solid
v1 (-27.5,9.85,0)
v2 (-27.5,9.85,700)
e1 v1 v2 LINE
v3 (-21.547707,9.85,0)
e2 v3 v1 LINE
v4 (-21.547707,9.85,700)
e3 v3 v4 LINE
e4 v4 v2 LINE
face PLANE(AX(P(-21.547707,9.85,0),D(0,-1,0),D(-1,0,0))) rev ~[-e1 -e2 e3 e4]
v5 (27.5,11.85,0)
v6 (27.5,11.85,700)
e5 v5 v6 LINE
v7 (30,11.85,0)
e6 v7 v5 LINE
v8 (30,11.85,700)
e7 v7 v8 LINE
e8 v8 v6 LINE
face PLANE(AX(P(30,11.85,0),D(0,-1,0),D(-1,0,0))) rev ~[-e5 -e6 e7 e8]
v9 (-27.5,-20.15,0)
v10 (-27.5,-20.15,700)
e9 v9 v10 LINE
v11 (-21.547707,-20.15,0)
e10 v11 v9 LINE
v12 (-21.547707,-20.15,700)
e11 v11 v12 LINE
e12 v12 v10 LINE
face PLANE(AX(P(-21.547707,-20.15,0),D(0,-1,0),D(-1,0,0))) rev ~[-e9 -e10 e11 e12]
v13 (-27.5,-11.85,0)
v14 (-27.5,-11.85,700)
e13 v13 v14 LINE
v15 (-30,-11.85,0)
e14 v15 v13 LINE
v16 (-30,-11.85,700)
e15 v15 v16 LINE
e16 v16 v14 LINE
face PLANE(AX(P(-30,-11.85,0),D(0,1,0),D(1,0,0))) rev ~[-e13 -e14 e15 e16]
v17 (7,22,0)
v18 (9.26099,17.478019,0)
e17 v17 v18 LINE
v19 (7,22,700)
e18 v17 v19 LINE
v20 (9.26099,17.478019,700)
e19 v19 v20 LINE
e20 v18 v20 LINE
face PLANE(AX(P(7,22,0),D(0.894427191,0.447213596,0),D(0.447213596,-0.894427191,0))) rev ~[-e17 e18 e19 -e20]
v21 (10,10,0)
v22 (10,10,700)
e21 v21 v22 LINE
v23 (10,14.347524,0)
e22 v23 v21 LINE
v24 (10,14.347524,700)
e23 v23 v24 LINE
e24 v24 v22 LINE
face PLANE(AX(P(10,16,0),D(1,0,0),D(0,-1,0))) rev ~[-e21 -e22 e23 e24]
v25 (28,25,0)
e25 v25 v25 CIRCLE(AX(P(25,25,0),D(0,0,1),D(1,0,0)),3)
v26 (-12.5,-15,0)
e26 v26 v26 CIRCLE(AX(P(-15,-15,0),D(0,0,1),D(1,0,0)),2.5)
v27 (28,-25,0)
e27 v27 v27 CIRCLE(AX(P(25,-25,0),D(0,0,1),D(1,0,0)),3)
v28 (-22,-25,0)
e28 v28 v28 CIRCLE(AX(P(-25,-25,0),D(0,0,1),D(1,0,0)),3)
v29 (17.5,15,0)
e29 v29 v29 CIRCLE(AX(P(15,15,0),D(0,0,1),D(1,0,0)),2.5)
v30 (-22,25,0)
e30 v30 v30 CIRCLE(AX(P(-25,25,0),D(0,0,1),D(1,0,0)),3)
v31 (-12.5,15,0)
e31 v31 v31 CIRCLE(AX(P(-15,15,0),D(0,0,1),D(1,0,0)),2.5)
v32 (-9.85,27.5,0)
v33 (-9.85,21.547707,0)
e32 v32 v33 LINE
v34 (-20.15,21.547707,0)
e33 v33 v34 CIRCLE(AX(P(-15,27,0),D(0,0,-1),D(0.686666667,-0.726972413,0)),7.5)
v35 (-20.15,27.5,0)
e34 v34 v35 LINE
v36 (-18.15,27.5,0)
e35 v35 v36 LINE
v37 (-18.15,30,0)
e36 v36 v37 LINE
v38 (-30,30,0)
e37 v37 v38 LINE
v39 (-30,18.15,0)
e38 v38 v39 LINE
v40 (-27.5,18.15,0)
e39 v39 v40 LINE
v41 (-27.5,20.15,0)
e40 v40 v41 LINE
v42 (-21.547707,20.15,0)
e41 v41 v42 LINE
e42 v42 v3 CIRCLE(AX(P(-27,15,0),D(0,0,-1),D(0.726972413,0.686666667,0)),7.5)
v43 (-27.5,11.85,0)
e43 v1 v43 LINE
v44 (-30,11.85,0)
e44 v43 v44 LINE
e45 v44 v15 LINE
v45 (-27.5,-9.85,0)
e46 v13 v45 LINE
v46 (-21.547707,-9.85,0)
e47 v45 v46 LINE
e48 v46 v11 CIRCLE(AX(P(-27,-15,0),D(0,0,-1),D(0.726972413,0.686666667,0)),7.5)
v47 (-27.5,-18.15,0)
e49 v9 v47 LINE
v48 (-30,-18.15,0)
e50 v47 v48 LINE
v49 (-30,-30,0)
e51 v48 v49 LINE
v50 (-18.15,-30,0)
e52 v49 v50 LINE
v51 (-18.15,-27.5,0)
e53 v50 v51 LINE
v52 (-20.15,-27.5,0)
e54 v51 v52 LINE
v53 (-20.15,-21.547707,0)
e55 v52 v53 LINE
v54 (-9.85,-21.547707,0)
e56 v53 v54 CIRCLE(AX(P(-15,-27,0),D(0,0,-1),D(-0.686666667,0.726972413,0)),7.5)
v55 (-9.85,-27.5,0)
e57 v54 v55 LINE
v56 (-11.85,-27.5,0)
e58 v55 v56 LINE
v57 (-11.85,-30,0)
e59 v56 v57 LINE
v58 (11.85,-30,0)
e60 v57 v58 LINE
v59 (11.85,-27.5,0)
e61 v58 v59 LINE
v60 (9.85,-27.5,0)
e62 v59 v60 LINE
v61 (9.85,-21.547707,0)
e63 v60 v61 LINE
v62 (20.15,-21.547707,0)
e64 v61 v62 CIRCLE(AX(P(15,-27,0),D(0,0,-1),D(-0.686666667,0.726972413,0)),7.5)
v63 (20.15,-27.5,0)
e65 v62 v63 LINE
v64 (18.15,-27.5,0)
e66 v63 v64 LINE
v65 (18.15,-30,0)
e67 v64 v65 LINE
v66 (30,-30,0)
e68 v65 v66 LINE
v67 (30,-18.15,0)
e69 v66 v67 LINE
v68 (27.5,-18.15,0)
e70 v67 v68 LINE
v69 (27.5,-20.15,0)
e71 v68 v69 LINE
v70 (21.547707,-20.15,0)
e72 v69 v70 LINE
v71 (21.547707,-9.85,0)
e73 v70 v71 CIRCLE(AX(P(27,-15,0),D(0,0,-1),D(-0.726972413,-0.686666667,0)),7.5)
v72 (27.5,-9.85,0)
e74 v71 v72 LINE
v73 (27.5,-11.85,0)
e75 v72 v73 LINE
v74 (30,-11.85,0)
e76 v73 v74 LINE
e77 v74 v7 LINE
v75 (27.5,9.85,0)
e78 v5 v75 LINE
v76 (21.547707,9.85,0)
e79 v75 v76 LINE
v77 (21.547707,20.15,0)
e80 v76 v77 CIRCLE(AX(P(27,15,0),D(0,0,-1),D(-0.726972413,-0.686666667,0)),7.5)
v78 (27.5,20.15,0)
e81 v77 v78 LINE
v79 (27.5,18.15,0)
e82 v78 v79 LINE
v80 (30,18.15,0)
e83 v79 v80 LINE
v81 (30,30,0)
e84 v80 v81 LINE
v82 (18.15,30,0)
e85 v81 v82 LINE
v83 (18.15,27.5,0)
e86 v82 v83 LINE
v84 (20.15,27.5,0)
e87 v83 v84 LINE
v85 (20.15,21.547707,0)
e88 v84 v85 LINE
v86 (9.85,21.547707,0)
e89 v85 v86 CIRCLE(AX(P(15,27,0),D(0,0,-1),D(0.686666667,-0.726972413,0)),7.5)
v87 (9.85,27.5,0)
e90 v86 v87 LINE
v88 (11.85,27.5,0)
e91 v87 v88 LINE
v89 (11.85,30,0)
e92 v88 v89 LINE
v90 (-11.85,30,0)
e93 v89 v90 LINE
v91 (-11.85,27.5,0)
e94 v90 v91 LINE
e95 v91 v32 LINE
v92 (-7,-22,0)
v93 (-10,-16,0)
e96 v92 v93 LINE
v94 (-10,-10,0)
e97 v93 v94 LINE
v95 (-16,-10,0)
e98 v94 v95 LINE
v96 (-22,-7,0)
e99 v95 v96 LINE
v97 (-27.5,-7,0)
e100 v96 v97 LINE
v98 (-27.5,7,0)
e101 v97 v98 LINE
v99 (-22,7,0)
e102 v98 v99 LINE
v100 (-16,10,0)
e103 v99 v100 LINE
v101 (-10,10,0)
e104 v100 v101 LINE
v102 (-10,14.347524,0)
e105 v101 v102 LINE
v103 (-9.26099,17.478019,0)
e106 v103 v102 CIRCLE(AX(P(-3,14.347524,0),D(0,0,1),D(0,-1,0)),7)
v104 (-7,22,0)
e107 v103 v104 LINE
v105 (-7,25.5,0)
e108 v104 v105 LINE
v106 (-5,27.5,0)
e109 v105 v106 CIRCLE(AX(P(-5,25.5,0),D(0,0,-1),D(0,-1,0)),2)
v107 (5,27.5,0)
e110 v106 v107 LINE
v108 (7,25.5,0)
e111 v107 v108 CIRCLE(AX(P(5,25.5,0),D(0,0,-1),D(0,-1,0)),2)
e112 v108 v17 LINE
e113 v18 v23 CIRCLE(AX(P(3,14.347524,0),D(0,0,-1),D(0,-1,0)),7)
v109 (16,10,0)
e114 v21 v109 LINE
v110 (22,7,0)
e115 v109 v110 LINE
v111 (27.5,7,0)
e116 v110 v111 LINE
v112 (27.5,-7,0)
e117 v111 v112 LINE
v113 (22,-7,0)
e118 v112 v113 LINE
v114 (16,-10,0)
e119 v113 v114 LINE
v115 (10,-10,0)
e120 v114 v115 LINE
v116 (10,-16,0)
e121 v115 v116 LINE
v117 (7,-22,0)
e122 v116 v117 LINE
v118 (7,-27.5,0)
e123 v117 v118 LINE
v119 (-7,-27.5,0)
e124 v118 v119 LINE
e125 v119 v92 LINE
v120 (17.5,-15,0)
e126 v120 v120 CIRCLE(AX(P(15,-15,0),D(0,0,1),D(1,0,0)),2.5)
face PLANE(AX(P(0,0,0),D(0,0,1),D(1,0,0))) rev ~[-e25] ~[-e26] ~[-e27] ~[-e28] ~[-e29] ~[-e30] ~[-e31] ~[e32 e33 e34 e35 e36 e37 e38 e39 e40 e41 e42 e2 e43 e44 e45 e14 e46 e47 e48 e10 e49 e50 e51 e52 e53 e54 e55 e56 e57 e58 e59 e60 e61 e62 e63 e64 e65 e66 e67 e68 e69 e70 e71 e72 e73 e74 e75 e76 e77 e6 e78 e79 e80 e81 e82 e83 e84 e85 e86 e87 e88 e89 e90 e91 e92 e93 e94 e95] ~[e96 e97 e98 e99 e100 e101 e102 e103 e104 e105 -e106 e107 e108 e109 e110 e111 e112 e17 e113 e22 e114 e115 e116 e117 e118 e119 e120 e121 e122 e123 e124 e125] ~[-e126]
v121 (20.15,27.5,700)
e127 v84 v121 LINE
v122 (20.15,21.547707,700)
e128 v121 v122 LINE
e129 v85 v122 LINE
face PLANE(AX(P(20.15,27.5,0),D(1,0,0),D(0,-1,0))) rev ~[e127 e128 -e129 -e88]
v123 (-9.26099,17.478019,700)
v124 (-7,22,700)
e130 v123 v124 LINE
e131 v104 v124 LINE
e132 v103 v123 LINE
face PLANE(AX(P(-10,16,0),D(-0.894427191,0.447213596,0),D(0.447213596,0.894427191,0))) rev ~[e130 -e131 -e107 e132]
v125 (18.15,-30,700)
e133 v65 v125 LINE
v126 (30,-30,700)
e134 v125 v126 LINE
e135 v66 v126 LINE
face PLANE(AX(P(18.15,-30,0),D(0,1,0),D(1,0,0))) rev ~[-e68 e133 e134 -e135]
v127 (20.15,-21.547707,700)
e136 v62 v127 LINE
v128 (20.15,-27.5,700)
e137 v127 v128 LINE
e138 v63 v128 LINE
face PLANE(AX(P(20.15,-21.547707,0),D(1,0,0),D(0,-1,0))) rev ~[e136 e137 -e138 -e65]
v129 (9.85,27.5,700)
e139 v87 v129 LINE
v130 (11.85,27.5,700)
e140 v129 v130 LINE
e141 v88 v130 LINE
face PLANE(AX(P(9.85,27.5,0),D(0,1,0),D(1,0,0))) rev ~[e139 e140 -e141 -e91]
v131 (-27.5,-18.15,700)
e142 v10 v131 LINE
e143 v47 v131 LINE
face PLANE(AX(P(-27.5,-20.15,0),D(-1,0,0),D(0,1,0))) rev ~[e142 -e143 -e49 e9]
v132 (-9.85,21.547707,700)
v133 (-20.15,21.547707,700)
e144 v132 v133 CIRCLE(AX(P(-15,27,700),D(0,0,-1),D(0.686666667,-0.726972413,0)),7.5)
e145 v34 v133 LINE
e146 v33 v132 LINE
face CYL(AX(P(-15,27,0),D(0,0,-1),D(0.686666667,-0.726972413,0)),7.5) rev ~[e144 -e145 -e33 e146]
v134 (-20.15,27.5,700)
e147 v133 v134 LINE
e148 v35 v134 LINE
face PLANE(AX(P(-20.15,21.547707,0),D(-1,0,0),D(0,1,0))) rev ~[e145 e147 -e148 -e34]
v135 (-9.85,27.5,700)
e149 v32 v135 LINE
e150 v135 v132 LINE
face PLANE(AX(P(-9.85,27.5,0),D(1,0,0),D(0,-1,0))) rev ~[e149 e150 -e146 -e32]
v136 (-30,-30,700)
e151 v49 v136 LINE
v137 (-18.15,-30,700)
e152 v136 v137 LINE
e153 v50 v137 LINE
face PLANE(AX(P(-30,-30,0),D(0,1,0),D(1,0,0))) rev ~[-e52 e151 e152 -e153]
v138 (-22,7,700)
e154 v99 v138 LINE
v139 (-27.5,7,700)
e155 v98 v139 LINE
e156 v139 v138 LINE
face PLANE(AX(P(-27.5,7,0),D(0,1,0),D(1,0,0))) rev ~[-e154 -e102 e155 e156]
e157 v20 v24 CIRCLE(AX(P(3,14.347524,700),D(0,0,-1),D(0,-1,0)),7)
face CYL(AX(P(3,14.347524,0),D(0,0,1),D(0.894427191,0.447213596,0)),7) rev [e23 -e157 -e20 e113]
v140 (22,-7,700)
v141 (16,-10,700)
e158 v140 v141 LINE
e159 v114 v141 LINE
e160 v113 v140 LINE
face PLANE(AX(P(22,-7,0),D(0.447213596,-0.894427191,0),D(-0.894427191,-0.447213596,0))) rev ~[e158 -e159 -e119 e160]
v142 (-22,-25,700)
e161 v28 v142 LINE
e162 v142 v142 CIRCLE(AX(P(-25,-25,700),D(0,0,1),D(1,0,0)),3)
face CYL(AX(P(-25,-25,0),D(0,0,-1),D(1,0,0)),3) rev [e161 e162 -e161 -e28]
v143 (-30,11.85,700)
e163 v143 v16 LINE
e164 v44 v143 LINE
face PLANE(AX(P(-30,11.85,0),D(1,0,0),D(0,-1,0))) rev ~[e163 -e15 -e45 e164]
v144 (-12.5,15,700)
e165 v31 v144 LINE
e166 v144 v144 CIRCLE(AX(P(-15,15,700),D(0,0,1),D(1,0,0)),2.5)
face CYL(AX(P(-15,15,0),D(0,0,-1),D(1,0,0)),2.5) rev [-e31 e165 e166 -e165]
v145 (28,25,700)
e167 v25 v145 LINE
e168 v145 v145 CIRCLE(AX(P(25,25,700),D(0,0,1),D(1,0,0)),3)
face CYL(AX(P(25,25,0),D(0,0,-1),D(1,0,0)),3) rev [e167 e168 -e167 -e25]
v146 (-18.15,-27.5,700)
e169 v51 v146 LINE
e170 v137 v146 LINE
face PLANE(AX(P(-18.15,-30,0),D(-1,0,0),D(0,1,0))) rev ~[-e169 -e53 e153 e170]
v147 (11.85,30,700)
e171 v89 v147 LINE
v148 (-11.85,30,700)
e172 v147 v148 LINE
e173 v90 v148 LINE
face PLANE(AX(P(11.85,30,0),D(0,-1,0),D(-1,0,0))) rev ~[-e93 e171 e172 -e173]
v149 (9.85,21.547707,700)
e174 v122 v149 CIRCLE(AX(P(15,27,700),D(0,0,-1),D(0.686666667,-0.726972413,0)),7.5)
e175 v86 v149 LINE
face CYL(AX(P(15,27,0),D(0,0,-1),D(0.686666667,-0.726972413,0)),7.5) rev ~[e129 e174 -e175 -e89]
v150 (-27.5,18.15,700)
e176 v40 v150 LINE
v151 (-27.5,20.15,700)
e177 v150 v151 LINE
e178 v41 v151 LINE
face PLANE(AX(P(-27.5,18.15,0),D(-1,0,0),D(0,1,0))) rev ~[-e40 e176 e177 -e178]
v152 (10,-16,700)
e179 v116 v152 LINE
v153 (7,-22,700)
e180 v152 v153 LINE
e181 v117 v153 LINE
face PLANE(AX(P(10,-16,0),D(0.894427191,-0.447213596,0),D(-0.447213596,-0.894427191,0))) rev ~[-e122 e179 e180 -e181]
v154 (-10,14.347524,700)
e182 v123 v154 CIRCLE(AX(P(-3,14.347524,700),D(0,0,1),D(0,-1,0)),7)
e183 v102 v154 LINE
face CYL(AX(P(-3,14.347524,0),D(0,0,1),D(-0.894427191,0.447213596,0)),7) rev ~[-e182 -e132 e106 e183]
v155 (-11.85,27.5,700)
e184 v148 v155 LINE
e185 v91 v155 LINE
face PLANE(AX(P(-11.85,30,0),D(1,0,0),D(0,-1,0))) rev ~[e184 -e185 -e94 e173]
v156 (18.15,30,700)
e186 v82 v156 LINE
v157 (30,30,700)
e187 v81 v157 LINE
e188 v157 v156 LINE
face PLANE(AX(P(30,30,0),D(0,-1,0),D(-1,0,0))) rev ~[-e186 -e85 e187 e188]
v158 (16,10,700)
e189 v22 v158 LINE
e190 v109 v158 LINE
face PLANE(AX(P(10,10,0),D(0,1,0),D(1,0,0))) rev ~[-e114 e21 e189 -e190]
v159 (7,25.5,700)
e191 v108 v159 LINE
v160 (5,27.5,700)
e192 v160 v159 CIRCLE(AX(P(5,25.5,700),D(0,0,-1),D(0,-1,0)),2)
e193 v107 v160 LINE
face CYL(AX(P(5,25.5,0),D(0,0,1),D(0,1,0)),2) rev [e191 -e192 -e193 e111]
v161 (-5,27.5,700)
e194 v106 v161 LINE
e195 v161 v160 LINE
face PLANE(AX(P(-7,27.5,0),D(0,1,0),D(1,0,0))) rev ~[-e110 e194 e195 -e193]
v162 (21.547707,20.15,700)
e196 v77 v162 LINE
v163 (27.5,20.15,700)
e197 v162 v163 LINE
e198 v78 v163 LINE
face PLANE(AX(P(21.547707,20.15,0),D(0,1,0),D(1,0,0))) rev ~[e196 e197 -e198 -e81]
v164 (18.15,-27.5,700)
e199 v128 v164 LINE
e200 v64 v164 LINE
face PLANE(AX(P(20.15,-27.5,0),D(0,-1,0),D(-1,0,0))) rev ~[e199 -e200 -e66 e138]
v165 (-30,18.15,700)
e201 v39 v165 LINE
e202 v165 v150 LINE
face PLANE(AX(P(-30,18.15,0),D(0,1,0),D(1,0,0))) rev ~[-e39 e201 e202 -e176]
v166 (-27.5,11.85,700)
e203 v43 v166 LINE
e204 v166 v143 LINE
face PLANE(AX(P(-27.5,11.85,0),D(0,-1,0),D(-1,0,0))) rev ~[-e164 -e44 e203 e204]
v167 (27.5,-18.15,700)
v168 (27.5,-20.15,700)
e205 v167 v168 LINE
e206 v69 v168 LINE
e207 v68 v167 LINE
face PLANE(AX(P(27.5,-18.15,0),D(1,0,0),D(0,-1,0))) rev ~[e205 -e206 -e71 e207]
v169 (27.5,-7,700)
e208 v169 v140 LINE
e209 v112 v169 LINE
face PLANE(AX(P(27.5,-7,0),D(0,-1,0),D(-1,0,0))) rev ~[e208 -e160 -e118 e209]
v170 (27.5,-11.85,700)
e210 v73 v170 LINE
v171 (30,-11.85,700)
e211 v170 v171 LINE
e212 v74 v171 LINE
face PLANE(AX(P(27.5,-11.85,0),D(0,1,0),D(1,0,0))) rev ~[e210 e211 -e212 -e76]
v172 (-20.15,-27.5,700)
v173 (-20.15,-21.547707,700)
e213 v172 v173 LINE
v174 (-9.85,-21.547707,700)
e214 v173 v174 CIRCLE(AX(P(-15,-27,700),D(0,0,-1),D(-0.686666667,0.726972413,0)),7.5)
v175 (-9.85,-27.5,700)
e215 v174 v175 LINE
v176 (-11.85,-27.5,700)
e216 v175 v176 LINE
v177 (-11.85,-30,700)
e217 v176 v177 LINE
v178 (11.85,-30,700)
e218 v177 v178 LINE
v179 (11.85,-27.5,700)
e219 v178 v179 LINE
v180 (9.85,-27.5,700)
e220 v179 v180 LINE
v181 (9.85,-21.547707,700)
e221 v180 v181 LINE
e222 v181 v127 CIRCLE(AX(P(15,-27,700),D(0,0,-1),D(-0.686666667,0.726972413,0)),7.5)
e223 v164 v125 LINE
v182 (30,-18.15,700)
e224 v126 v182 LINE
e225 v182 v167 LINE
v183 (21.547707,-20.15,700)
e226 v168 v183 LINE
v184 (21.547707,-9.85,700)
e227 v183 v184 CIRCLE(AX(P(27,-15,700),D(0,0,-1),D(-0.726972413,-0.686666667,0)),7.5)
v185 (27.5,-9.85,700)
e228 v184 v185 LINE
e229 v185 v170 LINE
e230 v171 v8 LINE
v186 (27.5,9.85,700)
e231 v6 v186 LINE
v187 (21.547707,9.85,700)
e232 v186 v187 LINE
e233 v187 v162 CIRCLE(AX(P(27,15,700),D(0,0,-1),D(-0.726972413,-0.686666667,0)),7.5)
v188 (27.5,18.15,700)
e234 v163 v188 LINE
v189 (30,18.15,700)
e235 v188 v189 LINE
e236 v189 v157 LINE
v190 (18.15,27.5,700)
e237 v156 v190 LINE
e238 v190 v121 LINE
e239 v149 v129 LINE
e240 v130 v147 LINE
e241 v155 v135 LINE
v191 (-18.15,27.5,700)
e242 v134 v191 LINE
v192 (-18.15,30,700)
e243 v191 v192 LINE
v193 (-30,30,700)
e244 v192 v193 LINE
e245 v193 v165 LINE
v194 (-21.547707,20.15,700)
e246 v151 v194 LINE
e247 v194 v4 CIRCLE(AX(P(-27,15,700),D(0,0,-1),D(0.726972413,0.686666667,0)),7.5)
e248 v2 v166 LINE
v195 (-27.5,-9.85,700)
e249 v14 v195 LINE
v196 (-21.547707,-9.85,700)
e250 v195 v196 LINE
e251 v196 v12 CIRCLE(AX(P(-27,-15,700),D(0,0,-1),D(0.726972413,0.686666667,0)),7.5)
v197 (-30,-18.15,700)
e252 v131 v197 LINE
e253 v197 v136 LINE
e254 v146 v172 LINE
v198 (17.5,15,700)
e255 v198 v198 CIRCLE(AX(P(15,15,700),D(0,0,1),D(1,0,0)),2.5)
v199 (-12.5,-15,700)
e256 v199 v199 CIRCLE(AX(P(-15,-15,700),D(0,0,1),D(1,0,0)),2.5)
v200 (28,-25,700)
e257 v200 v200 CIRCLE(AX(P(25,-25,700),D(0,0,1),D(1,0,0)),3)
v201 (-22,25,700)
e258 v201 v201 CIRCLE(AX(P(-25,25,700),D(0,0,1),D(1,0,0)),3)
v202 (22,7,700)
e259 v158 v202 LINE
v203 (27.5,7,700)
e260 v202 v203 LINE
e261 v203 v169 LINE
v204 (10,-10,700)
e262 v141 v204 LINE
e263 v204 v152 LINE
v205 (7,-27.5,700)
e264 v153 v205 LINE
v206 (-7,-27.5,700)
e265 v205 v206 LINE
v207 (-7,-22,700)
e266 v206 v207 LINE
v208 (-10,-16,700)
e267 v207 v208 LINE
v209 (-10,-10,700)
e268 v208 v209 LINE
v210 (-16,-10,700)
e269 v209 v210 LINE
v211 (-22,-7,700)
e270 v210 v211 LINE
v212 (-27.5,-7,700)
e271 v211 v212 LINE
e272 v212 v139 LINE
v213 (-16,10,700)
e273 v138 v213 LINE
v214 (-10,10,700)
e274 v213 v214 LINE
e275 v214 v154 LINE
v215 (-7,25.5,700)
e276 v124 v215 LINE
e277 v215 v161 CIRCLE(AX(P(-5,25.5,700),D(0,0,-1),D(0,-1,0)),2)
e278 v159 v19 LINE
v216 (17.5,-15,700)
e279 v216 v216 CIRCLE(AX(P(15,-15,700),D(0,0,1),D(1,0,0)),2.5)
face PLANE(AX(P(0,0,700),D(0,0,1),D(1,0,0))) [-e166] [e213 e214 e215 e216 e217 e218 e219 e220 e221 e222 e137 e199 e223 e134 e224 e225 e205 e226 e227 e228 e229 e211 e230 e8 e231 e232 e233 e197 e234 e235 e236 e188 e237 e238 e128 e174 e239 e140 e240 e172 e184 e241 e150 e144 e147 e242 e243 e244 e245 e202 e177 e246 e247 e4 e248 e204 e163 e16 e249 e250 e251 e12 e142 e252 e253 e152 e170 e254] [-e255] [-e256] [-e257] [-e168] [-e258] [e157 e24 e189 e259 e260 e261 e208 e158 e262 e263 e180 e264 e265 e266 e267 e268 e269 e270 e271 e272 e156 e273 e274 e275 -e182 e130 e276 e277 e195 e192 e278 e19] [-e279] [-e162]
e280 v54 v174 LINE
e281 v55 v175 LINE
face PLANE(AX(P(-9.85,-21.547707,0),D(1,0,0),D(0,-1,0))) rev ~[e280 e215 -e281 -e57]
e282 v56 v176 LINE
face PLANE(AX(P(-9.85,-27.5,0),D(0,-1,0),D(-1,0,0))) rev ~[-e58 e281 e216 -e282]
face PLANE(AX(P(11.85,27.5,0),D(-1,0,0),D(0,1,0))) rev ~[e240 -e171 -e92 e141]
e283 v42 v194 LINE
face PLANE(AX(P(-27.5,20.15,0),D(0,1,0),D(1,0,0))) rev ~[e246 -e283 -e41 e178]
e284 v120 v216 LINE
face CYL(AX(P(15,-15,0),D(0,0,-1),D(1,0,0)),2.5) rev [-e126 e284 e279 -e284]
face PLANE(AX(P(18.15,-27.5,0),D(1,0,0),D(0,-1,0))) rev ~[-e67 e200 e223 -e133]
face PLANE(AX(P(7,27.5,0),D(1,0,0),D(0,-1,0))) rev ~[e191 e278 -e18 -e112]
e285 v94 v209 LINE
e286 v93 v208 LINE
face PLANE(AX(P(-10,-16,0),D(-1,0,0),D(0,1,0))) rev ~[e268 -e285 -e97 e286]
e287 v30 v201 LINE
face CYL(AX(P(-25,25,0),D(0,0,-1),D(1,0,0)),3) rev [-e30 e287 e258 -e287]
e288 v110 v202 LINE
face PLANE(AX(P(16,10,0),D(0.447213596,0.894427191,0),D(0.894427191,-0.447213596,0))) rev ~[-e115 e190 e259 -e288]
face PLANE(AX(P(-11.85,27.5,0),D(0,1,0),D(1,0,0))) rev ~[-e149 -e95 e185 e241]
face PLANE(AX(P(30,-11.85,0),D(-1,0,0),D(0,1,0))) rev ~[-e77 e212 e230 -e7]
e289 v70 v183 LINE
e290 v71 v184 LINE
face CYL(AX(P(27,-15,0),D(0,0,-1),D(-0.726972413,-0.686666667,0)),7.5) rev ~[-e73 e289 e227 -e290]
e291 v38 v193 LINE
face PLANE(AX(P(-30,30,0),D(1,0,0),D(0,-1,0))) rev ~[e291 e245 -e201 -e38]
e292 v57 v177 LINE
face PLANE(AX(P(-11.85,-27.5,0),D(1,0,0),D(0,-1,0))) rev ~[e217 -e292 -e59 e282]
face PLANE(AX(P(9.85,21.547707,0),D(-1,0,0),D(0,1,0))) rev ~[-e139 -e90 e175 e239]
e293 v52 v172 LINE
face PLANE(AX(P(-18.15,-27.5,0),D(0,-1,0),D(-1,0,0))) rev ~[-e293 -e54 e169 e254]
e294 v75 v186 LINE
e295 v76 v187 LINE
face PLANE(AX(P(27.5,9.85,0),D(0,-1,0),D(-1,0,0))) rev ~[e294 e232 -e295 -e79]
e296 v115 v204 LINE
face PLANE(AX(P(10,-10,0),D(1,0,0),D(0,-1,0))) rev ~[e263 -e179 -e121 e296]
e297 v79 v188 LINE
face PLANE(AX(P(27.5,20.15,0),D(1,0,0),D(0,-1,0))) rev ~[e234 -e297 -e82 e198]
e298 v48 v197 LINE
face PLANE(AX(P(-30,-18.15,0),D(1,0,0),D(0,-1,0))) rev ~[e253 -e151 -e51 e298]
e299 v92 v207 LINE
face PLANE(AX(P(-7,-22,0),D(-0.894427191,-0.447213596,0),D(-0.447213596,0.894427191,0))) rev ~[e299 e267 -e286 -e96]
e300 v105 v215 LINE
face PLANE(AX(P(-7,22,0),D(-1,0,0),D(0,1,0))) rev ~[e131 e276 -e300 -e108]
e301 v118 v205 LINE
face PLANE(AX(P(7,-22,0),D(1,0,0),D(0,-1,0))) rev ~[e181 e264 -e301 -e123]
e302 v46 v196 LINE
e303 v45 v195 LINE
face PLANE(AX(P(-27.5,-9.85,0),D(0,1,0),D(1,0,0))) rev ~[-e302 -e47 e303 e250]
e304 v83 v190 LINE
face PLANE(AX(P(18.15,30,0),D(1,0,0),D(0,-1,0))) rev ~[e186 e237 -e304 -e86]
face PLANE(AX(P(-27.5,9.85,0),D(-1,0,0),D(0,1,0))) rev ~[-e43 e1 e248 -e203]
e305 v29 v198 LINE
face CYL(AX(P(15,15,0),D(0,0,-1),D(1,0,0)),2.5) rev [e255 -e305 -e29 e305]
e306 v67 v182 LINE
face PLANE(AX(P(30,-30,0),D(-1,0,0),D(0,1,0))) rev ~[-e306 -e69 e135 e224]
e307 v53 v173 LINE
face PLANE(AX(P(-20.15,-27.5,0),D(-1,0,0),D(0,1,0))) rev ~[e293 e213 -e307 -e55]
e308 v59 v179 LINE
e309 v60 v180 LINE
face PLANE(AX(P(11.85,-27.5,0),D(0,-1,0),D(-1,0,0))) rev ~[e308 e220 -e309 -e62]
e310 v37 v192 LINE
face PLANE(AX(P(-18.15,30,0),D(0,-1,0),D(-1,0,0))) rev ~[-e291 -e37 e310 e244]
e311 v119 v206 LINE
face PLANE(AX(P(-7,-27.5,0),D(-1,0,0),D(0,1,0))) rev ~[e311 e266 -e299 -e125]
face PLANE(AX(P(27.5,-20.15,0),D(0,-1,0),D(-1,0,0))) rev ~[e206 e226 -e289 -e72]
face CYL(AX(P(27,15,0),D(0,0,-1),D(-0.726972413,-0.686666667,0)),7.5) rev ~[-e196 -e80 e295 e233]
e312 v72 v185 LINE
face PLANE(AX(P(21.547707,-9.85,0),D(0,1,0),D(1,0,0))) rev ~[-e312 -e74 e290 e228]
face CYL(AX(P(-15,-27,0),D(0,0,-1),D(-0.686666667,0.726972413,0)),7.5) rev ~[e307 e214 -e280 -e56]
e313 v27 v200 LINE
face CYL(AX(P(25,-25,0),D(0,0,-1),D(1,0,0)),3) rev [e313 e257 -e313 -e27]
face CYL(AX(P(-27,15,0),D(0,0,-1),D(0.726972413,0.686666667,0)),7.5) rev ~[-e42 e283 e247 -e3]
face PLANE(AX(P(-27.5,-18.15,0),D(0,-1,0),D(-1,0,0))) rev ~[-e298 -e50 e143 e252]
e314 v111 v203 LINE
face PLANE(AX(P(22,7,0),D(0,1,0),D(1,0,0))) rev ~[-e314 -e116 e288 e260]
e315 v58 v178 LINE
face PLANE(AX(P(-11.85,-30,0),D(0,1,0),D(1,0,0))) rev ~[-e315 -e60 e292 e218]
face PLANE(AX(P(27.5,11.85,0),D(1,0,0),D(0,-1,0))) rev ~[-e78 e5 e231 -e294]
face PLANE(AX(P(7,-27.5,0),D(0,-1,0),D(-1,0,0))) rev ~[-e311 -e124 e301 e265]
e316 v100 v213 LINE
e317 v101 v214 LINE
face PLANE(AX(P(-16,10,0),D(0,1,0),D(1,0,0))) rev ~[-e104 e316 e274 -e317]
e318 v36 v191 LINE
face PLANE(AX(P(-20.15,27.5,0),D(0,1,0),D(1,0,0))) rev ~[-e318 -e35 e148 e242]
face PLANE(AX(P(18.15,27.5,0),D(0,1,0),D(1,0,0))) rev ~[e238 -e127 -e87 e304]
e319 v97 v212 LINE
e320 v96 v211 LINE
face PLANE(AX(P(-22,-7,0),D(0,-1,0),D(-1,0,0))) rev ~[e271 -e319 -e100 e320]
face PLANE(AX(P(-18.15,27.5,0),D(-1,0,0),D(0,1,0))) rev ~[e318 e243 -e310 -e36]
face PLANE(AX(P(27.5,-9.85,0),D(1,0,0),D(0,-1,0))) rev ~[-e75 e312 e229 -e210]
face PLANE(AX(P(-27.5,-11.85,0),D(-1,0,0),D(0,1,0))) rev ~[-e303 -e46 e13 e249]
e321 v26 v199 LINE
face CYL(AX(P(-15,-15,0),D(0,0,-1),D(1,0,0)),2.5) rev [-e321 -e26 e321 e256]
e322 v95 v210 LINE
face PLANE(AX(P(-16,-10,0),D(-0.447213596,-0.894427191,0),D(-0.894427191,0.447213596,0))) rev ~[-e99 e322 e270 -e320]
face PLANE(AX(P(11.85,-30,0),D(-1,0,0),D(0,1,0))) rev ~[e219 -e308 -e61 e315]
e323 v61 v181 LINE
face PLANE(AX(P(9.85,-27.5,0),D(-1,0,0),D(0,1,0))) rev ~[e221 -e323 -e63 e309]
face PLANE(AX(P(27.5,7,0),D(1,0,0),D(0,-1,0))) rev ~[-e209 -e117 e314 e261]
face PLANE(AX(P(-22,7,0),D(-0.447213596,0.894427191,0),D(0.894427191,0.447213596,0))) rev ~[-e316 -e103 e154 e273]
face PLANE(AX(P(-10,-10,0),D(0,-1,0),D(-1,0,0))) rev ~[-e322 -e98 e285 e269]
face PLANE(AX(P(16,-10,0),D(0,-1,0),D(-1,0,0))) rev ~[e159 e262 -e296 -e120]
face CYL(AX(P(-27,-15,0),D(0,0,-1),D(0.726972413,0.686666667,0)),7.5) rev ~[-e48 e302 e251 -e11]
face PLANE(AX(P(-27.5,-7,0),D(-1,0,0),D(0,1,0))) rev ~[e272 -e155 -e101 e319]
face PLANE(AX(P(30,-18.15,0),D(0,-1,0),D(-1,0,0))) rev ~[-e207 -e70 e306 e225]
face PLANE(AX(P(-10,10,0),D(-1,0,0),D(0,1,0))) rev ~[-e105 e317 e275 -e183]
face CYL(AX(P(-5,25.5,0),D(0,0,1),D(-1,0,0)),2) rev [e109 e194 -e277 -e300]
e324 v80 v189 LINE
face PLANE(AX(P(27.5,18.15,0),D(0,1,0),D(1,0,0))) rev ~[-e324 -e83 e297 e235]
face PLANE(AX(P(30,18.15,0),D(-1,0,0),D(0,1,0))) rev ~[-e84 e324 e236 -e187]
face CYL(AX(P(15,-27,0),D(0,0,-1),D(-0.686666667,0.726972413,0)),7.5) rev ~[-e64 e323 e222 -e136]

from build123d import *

# Parameters (mm, degrees)
F0_R     = 3
F0_R_2   = 2.5
F1_DEPTH = 700
F2_R     = 2
F3_R     = 7


# Not quite as in the source:
# - a feature names something its author has since deleted; it is built from what else it names


with BuildPart() as f1:
    # F0 (on Top) → F1 (new body)
    with BuildSketch(Plane.XY):
        with BuildLine():
            Line((18.15, -30), (30, -30))
            Line((30, -30), (30, -18.15))
            Line((30, -18.15), (27.5, -18.15))
            Line((27.5, -18.15), (27.5, -20.15))
            Line((27.5, -20.15), (21.5477069044, -20.15))
            ThreePointArc((21.5477069044, -20.15), (19.5, -15), (21.5477069044, -9.85))
            Line((21.5477069044, -9.85), (27.5, -9.85))
            Line((27.5, -9.85), (27.5, -11.85))
            Line((27.5, -11.85), (30, -11.85))
            Line((30, -11.85), (30, 11.85))
            Line((30, 11.85), (27.5, 11.85))
            Line((27.5, 11.85), (27.5, 9.85))
            Line((27.5, 9.85), (21.5477069044, 9.85))
            ThreePointArc((21.5477069044, 9.85), (19.5, 15), (21.5477069044, 20.15))
            Line((21.5477069044, 20.15), (27.5, 20.15))
            Line((27.5, 20.15), (27.5, 18.15))
            Line((27.5, 18.15), (30, 18.15))
            Line((30, 18.15), (30, 30))
            Line((30, 30), (18.15, 30))
            Line((18.15, 30), (18.15, 27.5))
            Line((18.15, 27.5), (20.15, 27.5))
            Line((20.15, 27.5), (20.15, 21.5477069044))
            ThreePointArc((20.15, 21.5477069044), (15, 19.5), (9.85, 21.5477069044))
            Line((9.85, 21.5477069044), (9.85, 27.5))
            Line((9.85, 27.5), (11.85, 27.5))
            Line((11.85, 27.5), (11.85, 30))
            Line((11.85, 30), (-11.85, 30))
            Line((-11.85, 30), (-11.85, 27.5))
            Line((-11.85, 27.5), (-9.85, 27.5))
            Line((-9.85, 27.5), (-9.85, 21.5477069044))
            ThreePointArc((-9.85, 21.5477069044), (-15, 19.5), (-20.15, 21.5477069044))
            Line((-20.15, 21.5477069044), (-20.15, 27.5))
            Line((-20.15, 27.5), (-18.15, 27.5))
            Line((-18.15, 27.5), (-18.15, 30))
            Line((-18.15, 30), (-30, 30))
            Line((-30, 30), (-30, 18.15))
            Line((-30, 18.15), (-27.5, 18.15))
            Line((-27.5, 18.15), (-27.5, 20.15))
            Line((-27.5, 20.15), (-21.5477069044, 20.15))
            ThreePointArc((-21.5477069044, 20.15), (-19.5, 15), (-21.5477069044, 9.85))
            Line((-21.5477069044, 9.85), (-27.5, 9.85))
            Line((-27.5, 9.85), (-27.5, 11.85))
            Line((-27.5, 11.85), (-30, 11.85))
            Line((-30, 11.85), (-30, -11.85))
            Line((-30, -11.85), (-27.5, -11.85))
            Line((-27.5, -11.85), (-27.5, -9.85))
            Line((-27.5, -9.85), (-21.5477069044, -9.85))
            ThreePointArc((-21.5477069044, -9.85), (-19.5, -15), (-21.5477069044, -20.15))
            Line((-21.5477069044, -20.15), (-27.5, -20.15))
            Line((-27.5, -20.15), (-27.5, -18.15))
            Line((-27.5, -18.15), (-30, -18.15))
            Line((-30, -18.15), (-30, -30))
            Line((-30, -30), (-18.15, -30))
            Line((-18.15, -30), (-18.15, -27.5))
            Line((-18.15, -27.5), (-20.15, -27.5))
            Line((-20.15, -27.5), (-20.15, -21.5477069044))
            ThreePointArc((-20.15, -21.5477069044), (-15, -19.5), (-9.85, -21.5477069044))
            Line((-9.85, -21.5477069044), (-9.85, -27.5))
            Line((-9.85, -27.5), (-11.85, -27.5))
            Line((-11.85, -27.5), (-11.85, -30))
            Line((-11.85, -30), (11.85, -30))
            Line((11.85, -30), (11.85, -27.5))
            Line((11.85, -27.5), (9.85, -27.5))
            Line((9.85, -27.5), (9.85, -21.5477069044))
            ThreePointArc((9.85, -21.5477069044), (15, -19.5), (20.15, -21.5477069044))
            Line((20.15, -21.5477069044), (20.15, -27.5))
            Line((20.15, -27.5), (18.15, -27.5))
            Line((18.15, -27.5), (18.15, -30))
        make_face()
        with Locations((-25, -25)):
            Circle(F0_R, mode=Mode.SUBTRACT)
        with Locations((-15, -15)):
            Circle(F0_R_2, mode=Mode.SUBTRACT)
        with Locations((25, -25)):
            Circle(F0_R, mode=Mode.SUBTRACT)
        with Locations((15, -15)):
            Circle(F0_R_2, mode=Mode.SUBTRACT)
        with Locations((-25, 25)):
            Circle(F0_R, mode=Mode.SUBTRACT)
        with Locations((-15, 15)):
            Circle(F0_R_2, mode=Mode.SUBTRACT)
        Polygon((-7, 22), (-7, 27.5), (0, 27.5), (7, 27.5), (7, 22), (10, 16), (10, 10), (16, 10), (22, 7), (27.5, 7), (27.5, 0), (27.5, -7), (22, -7), (16, -10), (10, -10), (10, -16), (7, -22), (7, -27.5), (0, -27.5), (-7, -27.5), (-7, -22), (-10, -16), (-10, -10), (-16, -10), (-22, -7), (-27.5, -7), (-27.5, 0), (-27.5, 7), (-22, 7), (-16, 10), (-10, 10), (-10, 16), align=None, mode=Mode.SUBTRACT)
        with Locations((15, 15)):
            Circle(F0_R_2, mode=Mode.SUBTRACT)
        with Locations((25, 25)):
            Circle(F0_R, mode=Mode.SUBTRACT)
    extrude(amount=F1_DEPTH)

    # F2
    f2_edges = [f1.edges().sort_by_distance(p)[0] for p in [
        (-7, 27.5, 350),
        (7, 27.5, 350),
    ]]
    fillet(f2_edges, radius=F2_R)

    # F3
    f3_edges = [f1.edges().sort_by_distance(p)[0] for p in [
        (-10, 16, 350),
        (10, 16, 350),
    ]]
    fillet(f3_edges, radius=F3_R)


solid = f1.part
